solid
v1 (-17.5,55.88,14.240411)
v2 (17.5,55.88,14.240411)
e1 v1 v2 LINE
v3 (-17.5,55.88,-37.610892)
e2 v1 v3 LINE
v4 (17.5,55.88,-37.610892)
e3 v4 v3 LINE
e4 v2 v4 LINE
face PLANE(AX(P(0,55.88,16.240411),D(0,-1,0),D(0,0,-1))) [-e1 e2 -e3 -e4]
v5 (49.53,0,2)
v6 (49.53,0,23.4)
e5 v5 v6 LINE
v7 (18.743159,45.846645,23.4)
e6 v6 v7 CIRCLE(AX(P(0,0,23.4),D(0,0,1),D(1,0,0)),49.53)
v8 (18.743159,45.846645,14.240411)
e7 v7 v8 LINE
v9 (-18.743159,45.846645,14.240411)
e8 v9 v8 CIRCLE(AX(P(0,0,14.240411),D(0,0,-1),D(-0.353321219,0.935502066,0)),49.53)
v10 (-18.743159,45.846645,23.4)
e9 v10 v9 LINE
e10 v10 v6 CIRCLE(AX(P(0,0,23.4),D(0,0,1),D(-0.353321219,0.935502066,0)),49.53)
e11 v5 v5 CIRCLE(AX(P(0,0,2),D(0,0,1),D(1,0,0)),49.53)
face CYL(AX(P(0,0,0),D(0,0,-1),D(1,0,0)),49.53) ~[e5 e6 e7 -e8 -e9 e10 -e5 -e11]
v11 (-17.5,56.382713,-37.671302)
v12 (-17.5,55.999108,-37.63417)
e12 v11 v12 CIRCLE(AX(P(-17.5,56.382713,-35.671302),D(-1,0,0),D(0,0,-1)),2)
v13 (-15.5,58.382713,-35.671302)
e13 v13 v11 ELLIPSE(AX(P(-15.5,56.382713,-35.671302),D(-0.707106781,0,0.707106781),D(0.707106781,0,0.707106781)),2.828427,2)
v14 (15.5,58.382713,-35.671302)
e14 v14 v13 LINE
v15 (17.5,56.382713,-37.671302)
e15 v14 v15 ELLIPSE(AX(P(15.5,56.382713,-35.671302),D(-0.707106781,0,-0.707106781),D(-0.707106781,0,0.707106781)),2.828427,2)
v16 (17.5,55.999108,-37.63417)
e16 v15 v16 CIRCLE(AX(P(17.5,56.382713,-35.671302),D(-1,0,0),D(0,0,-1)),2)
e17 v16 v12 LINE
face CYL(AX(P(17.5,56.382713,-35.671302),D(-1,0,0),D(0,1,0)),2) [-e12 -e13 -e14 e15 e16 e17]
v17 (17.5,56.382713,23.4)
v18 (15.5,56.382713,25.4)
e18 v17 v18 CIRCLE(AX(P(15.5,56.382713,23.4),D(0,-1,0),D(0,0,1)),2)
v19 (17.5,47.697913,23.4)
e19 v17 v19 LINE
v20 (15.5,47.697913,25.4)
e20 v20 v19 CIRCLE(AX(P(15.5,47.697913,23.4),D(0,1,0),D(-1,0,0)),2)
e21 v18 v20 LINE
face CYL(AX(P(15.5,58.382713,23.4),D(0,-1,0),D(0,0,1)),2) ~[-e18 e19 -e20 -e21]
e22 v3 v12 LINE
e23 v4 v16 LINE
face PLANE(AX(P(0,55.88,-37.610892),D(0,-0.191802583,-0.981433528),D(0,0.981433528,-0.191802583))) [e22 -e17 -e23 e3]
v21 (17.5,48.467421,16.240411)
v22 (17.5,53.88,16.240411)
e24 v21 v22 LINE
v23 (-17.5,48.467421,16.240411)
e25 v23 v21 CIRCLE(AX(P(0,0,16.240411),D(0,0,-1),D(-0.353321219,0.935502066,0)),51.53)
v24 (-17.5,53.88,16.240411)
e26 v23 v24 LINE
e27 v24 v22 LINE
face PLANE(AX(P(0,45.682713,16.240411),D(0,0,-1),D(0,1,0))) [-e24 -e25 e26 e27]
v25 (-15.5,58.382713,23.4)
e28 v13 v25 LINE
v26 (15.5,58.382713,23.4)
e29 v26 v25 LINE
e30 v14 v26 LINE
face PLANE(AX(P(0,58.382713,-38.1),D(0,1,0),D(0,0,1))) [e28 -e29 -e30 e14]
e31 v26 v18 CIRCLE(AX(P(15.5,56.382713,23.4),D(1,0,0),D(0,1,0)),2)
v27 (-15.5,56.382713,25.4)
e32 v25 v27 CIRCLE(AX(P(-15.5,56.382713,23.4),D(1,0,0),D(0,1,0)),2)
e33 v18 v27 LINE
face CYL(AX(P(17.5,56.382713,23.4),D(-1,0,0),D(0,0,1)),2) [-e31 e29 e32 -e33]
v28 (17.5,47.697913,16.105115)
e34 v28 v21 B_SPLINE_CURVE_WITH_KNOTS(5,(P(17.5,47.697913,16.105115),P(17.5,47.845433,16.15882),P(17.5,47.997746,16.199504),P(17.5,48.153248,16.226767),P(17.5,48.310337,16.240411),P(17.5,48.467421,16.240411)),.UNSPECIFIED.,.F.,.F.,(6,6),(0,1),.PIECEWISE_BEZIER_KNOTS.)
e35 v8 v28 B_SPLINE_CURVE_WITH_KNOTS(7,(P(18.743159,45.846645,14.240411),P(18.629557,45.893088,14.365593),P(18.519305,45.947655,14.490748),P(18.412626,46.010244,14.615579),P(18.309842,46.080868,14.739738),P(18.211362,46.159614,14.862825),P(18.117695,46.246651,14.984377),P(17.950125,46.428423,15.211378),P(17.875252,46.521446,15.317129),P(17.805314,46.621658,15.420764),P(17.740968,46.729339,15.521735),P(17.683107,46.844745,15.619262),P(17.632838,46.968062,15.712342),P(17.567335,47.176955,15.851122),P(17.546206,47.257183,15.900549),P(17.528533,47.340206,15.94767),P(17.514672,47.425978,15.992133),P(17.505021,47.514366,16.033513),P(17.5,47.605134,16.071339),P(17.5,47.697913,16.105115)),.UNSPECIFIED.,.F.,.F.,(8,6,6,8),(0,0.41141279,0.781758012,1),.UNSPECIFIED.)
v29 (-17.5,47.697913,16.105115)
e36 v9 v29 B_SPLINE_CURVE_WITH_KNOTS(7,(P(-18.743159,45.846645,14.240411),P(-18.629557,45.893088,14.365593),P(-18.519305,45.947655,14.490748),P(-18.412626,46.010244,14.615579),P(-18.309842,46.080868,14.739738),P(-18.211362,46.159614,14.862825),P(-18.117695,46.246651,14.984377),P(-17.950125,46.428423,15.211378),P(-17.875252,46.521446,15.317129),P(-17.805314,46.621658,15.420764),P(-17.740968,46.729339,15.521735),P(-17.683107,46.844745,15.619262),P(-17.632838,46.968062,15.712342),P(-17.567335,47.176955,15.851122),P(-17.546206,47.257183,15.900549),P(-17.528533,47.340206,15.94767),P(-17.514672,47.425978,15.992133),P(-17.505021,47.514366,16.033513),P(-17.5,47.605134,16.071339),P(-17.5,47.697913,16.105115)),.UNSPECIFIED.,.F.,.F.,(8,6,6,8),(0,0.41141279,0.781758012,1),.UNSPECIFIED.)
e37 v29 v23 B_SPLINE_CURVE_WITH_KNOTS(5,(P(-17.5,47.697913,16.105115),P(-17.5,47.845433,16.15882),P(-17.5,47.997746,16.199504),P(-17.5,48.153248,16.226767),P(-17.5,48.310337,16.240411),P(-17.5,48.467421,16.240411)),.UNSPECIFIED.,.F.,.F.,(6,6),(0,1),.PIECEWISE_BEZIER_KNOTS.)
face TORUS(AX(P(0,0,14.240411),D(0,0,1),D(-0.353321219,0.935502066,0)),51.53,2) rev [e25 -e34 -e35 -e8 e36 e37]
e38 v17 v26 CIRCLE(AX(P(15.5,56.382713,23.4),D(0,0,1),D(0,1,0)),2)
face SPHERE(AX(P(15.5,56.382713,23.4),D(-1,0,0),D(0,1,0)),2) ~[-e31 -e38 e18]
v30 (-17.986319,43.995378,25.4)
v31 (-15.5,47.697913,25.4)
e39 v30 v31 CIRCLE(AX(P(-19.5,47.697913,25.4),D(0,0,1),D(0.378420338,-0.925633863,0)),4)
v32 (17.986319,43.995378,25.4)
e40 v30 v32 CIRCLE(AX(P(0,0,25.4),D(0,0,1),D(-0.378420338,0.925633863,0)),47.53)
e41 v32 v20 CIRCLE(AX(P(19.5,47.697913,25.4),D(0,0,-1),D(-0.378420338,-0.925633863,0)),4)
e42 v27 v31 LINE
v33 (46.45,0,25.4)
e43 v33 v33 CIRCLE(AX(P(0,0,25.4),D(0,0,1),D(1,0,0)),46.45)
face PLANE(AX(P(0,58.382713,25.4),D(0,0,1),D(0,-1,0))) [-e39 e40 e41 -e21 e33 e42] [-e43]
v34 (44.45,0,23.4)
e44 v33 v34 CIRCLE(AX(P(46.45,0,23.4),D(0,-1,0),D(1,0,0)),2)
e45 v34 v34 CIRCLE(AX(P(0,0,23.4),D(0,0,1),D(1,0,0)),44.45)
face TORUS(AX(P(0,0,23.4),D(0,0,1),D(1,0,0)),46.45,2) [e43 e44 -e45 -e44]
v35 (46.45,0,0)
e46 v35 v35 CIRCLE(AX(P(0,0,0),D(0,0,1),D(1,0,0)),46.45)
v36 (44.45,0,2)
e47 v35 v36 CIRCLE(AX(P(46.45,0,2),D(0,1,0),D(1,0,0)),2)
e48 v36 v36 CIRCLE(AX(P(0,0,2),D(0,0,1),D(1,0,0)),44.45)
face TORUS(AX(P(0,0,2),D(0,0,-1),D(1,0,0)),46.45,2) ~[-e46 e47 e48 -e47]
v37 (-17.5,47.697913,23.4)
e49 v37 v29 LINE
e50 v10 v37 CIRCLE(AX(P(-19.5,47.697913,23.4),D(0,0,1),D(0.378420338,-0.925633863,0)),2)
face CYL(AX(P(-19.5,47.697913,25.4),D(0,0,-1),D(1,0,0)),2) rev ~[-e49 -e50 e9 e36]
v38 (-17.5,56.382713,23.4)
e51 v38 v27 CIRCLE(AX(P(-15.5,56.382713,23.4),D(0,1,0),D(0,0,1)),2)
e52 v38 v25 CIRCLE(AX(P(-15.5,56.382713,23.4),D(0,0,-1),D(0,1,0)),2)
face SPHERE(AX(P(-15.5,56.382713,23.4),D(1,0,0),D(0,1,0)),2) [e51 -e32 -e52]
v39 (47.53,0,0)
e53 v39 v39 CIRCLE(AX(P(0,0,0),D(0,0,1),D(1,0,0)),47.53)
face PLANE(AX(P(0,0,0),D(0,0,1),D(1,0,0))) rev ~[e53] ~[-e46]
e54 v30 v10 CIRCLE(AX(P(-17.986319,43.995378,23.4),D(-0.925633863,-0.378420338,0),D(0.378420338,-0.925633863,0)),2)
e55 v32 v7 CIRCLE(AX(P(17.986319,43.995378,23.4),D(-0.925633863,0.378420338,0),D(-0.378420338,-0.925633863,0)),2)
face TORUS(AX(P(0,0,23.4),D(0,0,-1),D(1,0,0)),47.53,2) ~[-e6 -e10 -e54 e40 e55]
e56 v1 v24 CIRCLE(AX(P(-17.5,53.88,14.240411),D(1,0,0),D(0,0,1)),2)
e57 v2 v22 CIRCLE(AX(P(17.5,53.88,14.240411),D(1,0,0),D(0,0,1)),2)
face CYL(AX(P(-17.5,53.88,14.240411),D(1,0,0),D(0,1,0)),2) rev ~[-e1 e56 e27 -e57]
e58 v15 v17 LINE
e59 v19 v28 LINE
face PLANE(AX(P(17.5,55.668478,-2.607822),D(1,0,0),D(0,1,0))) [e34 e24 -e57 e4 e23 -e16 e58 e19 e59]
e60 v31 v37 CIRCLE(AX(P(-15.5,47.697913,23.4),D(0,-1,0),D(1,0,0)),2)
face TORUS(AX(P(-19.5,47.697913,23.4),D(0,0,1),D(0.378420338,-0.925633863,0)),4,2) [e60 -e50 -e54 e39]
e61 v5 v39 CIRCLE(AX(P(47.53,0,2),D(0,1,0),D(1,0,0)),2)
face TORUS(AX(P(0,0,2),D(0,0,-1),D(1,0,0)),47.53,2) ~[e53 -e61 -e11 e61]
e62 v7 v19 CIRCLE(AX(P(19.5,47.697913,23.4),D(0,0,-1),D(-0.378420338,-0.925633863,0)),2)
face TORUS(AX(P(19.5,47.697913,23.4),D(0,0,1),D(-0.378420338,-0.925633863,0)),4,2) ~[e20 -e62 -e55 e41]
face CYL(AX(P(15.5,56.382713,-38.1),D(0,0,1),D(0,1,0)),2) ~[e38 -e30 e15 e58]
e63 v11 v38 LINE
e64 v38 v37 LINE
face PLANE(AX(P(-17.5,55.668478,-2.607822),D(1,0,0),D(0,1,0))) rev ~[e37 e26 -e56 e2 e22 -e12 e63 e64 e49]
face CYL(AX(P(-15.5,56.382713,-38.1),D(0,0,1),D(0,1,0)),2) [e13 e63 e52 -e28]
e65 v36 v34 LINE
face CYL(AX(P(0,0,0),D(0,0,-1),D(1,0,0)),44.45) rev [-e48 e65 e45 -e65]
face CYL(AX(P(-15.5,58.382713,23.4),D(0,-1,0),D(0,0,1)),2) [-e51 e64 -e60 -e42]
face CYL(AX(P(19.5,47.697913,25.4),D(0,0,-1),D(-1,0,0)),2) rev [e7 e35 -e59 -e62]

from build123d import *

# Parameters (mm, degrees)
F0_R     = 49.53
F0_R_2   = 44.45
F1_DEPTH = 25.4
F3_DEPTH = 17.5
F4_R     = 2


with BuildPart() as f1:
    # F0 (on Top) → F1 (new body)
    with BuildSketch(Plane.XY):
        Circle(F0_R)
        Circle(F0_R_2, mode=Mode.SUBTRACT)
    extrude(amount=F1_DEPTH)

    # F2 (on Right) → F3 (join, symmetric)
    with BuildSketch(Plane.YZ):
        Polygon((58.382712847, 25.4), (45.682712847, 25.4), (45.682712847, 16.2404105067), (55.88, 16.2404105067), (55.88, -37.6108922064), (58.382712847, -38.1), align=None)
    extrude(amount=F3_DEPTH, both=True)

    # F4
    f4_edges = [f1.edges().sort_by_distance(p)[0] for p in [
        (0, 55.88, 16.240411),
        (0, 49.53, 16.240411),
        (17.5, 46.335417, 20.820205),
        (-17.5, 46.335417, 20.820205),
        (0, 58.382713, 25.4),
        (-44.45, 0, 25.4),
        (-49.53, 0, 0),
        (49.53, 0, 12.7),
        (-28.164214, -40.743072, 25.4),
        (40.743072, 28.164214, 25.4),
        (44.45, 0, 12.7),
        (-44.45, 0, 0),
        (-17.5, 58.382713, -6.35),
        (17.5, 58.382713, -6.35),
        (0, 58.382713, -38.1),
        (17.5, 52.359065, 25.4),
        (-17.5, 52.359065, 25.4),
    ]]
    fillet(f4_edges, radius=F4_R)


solid = f1.part
